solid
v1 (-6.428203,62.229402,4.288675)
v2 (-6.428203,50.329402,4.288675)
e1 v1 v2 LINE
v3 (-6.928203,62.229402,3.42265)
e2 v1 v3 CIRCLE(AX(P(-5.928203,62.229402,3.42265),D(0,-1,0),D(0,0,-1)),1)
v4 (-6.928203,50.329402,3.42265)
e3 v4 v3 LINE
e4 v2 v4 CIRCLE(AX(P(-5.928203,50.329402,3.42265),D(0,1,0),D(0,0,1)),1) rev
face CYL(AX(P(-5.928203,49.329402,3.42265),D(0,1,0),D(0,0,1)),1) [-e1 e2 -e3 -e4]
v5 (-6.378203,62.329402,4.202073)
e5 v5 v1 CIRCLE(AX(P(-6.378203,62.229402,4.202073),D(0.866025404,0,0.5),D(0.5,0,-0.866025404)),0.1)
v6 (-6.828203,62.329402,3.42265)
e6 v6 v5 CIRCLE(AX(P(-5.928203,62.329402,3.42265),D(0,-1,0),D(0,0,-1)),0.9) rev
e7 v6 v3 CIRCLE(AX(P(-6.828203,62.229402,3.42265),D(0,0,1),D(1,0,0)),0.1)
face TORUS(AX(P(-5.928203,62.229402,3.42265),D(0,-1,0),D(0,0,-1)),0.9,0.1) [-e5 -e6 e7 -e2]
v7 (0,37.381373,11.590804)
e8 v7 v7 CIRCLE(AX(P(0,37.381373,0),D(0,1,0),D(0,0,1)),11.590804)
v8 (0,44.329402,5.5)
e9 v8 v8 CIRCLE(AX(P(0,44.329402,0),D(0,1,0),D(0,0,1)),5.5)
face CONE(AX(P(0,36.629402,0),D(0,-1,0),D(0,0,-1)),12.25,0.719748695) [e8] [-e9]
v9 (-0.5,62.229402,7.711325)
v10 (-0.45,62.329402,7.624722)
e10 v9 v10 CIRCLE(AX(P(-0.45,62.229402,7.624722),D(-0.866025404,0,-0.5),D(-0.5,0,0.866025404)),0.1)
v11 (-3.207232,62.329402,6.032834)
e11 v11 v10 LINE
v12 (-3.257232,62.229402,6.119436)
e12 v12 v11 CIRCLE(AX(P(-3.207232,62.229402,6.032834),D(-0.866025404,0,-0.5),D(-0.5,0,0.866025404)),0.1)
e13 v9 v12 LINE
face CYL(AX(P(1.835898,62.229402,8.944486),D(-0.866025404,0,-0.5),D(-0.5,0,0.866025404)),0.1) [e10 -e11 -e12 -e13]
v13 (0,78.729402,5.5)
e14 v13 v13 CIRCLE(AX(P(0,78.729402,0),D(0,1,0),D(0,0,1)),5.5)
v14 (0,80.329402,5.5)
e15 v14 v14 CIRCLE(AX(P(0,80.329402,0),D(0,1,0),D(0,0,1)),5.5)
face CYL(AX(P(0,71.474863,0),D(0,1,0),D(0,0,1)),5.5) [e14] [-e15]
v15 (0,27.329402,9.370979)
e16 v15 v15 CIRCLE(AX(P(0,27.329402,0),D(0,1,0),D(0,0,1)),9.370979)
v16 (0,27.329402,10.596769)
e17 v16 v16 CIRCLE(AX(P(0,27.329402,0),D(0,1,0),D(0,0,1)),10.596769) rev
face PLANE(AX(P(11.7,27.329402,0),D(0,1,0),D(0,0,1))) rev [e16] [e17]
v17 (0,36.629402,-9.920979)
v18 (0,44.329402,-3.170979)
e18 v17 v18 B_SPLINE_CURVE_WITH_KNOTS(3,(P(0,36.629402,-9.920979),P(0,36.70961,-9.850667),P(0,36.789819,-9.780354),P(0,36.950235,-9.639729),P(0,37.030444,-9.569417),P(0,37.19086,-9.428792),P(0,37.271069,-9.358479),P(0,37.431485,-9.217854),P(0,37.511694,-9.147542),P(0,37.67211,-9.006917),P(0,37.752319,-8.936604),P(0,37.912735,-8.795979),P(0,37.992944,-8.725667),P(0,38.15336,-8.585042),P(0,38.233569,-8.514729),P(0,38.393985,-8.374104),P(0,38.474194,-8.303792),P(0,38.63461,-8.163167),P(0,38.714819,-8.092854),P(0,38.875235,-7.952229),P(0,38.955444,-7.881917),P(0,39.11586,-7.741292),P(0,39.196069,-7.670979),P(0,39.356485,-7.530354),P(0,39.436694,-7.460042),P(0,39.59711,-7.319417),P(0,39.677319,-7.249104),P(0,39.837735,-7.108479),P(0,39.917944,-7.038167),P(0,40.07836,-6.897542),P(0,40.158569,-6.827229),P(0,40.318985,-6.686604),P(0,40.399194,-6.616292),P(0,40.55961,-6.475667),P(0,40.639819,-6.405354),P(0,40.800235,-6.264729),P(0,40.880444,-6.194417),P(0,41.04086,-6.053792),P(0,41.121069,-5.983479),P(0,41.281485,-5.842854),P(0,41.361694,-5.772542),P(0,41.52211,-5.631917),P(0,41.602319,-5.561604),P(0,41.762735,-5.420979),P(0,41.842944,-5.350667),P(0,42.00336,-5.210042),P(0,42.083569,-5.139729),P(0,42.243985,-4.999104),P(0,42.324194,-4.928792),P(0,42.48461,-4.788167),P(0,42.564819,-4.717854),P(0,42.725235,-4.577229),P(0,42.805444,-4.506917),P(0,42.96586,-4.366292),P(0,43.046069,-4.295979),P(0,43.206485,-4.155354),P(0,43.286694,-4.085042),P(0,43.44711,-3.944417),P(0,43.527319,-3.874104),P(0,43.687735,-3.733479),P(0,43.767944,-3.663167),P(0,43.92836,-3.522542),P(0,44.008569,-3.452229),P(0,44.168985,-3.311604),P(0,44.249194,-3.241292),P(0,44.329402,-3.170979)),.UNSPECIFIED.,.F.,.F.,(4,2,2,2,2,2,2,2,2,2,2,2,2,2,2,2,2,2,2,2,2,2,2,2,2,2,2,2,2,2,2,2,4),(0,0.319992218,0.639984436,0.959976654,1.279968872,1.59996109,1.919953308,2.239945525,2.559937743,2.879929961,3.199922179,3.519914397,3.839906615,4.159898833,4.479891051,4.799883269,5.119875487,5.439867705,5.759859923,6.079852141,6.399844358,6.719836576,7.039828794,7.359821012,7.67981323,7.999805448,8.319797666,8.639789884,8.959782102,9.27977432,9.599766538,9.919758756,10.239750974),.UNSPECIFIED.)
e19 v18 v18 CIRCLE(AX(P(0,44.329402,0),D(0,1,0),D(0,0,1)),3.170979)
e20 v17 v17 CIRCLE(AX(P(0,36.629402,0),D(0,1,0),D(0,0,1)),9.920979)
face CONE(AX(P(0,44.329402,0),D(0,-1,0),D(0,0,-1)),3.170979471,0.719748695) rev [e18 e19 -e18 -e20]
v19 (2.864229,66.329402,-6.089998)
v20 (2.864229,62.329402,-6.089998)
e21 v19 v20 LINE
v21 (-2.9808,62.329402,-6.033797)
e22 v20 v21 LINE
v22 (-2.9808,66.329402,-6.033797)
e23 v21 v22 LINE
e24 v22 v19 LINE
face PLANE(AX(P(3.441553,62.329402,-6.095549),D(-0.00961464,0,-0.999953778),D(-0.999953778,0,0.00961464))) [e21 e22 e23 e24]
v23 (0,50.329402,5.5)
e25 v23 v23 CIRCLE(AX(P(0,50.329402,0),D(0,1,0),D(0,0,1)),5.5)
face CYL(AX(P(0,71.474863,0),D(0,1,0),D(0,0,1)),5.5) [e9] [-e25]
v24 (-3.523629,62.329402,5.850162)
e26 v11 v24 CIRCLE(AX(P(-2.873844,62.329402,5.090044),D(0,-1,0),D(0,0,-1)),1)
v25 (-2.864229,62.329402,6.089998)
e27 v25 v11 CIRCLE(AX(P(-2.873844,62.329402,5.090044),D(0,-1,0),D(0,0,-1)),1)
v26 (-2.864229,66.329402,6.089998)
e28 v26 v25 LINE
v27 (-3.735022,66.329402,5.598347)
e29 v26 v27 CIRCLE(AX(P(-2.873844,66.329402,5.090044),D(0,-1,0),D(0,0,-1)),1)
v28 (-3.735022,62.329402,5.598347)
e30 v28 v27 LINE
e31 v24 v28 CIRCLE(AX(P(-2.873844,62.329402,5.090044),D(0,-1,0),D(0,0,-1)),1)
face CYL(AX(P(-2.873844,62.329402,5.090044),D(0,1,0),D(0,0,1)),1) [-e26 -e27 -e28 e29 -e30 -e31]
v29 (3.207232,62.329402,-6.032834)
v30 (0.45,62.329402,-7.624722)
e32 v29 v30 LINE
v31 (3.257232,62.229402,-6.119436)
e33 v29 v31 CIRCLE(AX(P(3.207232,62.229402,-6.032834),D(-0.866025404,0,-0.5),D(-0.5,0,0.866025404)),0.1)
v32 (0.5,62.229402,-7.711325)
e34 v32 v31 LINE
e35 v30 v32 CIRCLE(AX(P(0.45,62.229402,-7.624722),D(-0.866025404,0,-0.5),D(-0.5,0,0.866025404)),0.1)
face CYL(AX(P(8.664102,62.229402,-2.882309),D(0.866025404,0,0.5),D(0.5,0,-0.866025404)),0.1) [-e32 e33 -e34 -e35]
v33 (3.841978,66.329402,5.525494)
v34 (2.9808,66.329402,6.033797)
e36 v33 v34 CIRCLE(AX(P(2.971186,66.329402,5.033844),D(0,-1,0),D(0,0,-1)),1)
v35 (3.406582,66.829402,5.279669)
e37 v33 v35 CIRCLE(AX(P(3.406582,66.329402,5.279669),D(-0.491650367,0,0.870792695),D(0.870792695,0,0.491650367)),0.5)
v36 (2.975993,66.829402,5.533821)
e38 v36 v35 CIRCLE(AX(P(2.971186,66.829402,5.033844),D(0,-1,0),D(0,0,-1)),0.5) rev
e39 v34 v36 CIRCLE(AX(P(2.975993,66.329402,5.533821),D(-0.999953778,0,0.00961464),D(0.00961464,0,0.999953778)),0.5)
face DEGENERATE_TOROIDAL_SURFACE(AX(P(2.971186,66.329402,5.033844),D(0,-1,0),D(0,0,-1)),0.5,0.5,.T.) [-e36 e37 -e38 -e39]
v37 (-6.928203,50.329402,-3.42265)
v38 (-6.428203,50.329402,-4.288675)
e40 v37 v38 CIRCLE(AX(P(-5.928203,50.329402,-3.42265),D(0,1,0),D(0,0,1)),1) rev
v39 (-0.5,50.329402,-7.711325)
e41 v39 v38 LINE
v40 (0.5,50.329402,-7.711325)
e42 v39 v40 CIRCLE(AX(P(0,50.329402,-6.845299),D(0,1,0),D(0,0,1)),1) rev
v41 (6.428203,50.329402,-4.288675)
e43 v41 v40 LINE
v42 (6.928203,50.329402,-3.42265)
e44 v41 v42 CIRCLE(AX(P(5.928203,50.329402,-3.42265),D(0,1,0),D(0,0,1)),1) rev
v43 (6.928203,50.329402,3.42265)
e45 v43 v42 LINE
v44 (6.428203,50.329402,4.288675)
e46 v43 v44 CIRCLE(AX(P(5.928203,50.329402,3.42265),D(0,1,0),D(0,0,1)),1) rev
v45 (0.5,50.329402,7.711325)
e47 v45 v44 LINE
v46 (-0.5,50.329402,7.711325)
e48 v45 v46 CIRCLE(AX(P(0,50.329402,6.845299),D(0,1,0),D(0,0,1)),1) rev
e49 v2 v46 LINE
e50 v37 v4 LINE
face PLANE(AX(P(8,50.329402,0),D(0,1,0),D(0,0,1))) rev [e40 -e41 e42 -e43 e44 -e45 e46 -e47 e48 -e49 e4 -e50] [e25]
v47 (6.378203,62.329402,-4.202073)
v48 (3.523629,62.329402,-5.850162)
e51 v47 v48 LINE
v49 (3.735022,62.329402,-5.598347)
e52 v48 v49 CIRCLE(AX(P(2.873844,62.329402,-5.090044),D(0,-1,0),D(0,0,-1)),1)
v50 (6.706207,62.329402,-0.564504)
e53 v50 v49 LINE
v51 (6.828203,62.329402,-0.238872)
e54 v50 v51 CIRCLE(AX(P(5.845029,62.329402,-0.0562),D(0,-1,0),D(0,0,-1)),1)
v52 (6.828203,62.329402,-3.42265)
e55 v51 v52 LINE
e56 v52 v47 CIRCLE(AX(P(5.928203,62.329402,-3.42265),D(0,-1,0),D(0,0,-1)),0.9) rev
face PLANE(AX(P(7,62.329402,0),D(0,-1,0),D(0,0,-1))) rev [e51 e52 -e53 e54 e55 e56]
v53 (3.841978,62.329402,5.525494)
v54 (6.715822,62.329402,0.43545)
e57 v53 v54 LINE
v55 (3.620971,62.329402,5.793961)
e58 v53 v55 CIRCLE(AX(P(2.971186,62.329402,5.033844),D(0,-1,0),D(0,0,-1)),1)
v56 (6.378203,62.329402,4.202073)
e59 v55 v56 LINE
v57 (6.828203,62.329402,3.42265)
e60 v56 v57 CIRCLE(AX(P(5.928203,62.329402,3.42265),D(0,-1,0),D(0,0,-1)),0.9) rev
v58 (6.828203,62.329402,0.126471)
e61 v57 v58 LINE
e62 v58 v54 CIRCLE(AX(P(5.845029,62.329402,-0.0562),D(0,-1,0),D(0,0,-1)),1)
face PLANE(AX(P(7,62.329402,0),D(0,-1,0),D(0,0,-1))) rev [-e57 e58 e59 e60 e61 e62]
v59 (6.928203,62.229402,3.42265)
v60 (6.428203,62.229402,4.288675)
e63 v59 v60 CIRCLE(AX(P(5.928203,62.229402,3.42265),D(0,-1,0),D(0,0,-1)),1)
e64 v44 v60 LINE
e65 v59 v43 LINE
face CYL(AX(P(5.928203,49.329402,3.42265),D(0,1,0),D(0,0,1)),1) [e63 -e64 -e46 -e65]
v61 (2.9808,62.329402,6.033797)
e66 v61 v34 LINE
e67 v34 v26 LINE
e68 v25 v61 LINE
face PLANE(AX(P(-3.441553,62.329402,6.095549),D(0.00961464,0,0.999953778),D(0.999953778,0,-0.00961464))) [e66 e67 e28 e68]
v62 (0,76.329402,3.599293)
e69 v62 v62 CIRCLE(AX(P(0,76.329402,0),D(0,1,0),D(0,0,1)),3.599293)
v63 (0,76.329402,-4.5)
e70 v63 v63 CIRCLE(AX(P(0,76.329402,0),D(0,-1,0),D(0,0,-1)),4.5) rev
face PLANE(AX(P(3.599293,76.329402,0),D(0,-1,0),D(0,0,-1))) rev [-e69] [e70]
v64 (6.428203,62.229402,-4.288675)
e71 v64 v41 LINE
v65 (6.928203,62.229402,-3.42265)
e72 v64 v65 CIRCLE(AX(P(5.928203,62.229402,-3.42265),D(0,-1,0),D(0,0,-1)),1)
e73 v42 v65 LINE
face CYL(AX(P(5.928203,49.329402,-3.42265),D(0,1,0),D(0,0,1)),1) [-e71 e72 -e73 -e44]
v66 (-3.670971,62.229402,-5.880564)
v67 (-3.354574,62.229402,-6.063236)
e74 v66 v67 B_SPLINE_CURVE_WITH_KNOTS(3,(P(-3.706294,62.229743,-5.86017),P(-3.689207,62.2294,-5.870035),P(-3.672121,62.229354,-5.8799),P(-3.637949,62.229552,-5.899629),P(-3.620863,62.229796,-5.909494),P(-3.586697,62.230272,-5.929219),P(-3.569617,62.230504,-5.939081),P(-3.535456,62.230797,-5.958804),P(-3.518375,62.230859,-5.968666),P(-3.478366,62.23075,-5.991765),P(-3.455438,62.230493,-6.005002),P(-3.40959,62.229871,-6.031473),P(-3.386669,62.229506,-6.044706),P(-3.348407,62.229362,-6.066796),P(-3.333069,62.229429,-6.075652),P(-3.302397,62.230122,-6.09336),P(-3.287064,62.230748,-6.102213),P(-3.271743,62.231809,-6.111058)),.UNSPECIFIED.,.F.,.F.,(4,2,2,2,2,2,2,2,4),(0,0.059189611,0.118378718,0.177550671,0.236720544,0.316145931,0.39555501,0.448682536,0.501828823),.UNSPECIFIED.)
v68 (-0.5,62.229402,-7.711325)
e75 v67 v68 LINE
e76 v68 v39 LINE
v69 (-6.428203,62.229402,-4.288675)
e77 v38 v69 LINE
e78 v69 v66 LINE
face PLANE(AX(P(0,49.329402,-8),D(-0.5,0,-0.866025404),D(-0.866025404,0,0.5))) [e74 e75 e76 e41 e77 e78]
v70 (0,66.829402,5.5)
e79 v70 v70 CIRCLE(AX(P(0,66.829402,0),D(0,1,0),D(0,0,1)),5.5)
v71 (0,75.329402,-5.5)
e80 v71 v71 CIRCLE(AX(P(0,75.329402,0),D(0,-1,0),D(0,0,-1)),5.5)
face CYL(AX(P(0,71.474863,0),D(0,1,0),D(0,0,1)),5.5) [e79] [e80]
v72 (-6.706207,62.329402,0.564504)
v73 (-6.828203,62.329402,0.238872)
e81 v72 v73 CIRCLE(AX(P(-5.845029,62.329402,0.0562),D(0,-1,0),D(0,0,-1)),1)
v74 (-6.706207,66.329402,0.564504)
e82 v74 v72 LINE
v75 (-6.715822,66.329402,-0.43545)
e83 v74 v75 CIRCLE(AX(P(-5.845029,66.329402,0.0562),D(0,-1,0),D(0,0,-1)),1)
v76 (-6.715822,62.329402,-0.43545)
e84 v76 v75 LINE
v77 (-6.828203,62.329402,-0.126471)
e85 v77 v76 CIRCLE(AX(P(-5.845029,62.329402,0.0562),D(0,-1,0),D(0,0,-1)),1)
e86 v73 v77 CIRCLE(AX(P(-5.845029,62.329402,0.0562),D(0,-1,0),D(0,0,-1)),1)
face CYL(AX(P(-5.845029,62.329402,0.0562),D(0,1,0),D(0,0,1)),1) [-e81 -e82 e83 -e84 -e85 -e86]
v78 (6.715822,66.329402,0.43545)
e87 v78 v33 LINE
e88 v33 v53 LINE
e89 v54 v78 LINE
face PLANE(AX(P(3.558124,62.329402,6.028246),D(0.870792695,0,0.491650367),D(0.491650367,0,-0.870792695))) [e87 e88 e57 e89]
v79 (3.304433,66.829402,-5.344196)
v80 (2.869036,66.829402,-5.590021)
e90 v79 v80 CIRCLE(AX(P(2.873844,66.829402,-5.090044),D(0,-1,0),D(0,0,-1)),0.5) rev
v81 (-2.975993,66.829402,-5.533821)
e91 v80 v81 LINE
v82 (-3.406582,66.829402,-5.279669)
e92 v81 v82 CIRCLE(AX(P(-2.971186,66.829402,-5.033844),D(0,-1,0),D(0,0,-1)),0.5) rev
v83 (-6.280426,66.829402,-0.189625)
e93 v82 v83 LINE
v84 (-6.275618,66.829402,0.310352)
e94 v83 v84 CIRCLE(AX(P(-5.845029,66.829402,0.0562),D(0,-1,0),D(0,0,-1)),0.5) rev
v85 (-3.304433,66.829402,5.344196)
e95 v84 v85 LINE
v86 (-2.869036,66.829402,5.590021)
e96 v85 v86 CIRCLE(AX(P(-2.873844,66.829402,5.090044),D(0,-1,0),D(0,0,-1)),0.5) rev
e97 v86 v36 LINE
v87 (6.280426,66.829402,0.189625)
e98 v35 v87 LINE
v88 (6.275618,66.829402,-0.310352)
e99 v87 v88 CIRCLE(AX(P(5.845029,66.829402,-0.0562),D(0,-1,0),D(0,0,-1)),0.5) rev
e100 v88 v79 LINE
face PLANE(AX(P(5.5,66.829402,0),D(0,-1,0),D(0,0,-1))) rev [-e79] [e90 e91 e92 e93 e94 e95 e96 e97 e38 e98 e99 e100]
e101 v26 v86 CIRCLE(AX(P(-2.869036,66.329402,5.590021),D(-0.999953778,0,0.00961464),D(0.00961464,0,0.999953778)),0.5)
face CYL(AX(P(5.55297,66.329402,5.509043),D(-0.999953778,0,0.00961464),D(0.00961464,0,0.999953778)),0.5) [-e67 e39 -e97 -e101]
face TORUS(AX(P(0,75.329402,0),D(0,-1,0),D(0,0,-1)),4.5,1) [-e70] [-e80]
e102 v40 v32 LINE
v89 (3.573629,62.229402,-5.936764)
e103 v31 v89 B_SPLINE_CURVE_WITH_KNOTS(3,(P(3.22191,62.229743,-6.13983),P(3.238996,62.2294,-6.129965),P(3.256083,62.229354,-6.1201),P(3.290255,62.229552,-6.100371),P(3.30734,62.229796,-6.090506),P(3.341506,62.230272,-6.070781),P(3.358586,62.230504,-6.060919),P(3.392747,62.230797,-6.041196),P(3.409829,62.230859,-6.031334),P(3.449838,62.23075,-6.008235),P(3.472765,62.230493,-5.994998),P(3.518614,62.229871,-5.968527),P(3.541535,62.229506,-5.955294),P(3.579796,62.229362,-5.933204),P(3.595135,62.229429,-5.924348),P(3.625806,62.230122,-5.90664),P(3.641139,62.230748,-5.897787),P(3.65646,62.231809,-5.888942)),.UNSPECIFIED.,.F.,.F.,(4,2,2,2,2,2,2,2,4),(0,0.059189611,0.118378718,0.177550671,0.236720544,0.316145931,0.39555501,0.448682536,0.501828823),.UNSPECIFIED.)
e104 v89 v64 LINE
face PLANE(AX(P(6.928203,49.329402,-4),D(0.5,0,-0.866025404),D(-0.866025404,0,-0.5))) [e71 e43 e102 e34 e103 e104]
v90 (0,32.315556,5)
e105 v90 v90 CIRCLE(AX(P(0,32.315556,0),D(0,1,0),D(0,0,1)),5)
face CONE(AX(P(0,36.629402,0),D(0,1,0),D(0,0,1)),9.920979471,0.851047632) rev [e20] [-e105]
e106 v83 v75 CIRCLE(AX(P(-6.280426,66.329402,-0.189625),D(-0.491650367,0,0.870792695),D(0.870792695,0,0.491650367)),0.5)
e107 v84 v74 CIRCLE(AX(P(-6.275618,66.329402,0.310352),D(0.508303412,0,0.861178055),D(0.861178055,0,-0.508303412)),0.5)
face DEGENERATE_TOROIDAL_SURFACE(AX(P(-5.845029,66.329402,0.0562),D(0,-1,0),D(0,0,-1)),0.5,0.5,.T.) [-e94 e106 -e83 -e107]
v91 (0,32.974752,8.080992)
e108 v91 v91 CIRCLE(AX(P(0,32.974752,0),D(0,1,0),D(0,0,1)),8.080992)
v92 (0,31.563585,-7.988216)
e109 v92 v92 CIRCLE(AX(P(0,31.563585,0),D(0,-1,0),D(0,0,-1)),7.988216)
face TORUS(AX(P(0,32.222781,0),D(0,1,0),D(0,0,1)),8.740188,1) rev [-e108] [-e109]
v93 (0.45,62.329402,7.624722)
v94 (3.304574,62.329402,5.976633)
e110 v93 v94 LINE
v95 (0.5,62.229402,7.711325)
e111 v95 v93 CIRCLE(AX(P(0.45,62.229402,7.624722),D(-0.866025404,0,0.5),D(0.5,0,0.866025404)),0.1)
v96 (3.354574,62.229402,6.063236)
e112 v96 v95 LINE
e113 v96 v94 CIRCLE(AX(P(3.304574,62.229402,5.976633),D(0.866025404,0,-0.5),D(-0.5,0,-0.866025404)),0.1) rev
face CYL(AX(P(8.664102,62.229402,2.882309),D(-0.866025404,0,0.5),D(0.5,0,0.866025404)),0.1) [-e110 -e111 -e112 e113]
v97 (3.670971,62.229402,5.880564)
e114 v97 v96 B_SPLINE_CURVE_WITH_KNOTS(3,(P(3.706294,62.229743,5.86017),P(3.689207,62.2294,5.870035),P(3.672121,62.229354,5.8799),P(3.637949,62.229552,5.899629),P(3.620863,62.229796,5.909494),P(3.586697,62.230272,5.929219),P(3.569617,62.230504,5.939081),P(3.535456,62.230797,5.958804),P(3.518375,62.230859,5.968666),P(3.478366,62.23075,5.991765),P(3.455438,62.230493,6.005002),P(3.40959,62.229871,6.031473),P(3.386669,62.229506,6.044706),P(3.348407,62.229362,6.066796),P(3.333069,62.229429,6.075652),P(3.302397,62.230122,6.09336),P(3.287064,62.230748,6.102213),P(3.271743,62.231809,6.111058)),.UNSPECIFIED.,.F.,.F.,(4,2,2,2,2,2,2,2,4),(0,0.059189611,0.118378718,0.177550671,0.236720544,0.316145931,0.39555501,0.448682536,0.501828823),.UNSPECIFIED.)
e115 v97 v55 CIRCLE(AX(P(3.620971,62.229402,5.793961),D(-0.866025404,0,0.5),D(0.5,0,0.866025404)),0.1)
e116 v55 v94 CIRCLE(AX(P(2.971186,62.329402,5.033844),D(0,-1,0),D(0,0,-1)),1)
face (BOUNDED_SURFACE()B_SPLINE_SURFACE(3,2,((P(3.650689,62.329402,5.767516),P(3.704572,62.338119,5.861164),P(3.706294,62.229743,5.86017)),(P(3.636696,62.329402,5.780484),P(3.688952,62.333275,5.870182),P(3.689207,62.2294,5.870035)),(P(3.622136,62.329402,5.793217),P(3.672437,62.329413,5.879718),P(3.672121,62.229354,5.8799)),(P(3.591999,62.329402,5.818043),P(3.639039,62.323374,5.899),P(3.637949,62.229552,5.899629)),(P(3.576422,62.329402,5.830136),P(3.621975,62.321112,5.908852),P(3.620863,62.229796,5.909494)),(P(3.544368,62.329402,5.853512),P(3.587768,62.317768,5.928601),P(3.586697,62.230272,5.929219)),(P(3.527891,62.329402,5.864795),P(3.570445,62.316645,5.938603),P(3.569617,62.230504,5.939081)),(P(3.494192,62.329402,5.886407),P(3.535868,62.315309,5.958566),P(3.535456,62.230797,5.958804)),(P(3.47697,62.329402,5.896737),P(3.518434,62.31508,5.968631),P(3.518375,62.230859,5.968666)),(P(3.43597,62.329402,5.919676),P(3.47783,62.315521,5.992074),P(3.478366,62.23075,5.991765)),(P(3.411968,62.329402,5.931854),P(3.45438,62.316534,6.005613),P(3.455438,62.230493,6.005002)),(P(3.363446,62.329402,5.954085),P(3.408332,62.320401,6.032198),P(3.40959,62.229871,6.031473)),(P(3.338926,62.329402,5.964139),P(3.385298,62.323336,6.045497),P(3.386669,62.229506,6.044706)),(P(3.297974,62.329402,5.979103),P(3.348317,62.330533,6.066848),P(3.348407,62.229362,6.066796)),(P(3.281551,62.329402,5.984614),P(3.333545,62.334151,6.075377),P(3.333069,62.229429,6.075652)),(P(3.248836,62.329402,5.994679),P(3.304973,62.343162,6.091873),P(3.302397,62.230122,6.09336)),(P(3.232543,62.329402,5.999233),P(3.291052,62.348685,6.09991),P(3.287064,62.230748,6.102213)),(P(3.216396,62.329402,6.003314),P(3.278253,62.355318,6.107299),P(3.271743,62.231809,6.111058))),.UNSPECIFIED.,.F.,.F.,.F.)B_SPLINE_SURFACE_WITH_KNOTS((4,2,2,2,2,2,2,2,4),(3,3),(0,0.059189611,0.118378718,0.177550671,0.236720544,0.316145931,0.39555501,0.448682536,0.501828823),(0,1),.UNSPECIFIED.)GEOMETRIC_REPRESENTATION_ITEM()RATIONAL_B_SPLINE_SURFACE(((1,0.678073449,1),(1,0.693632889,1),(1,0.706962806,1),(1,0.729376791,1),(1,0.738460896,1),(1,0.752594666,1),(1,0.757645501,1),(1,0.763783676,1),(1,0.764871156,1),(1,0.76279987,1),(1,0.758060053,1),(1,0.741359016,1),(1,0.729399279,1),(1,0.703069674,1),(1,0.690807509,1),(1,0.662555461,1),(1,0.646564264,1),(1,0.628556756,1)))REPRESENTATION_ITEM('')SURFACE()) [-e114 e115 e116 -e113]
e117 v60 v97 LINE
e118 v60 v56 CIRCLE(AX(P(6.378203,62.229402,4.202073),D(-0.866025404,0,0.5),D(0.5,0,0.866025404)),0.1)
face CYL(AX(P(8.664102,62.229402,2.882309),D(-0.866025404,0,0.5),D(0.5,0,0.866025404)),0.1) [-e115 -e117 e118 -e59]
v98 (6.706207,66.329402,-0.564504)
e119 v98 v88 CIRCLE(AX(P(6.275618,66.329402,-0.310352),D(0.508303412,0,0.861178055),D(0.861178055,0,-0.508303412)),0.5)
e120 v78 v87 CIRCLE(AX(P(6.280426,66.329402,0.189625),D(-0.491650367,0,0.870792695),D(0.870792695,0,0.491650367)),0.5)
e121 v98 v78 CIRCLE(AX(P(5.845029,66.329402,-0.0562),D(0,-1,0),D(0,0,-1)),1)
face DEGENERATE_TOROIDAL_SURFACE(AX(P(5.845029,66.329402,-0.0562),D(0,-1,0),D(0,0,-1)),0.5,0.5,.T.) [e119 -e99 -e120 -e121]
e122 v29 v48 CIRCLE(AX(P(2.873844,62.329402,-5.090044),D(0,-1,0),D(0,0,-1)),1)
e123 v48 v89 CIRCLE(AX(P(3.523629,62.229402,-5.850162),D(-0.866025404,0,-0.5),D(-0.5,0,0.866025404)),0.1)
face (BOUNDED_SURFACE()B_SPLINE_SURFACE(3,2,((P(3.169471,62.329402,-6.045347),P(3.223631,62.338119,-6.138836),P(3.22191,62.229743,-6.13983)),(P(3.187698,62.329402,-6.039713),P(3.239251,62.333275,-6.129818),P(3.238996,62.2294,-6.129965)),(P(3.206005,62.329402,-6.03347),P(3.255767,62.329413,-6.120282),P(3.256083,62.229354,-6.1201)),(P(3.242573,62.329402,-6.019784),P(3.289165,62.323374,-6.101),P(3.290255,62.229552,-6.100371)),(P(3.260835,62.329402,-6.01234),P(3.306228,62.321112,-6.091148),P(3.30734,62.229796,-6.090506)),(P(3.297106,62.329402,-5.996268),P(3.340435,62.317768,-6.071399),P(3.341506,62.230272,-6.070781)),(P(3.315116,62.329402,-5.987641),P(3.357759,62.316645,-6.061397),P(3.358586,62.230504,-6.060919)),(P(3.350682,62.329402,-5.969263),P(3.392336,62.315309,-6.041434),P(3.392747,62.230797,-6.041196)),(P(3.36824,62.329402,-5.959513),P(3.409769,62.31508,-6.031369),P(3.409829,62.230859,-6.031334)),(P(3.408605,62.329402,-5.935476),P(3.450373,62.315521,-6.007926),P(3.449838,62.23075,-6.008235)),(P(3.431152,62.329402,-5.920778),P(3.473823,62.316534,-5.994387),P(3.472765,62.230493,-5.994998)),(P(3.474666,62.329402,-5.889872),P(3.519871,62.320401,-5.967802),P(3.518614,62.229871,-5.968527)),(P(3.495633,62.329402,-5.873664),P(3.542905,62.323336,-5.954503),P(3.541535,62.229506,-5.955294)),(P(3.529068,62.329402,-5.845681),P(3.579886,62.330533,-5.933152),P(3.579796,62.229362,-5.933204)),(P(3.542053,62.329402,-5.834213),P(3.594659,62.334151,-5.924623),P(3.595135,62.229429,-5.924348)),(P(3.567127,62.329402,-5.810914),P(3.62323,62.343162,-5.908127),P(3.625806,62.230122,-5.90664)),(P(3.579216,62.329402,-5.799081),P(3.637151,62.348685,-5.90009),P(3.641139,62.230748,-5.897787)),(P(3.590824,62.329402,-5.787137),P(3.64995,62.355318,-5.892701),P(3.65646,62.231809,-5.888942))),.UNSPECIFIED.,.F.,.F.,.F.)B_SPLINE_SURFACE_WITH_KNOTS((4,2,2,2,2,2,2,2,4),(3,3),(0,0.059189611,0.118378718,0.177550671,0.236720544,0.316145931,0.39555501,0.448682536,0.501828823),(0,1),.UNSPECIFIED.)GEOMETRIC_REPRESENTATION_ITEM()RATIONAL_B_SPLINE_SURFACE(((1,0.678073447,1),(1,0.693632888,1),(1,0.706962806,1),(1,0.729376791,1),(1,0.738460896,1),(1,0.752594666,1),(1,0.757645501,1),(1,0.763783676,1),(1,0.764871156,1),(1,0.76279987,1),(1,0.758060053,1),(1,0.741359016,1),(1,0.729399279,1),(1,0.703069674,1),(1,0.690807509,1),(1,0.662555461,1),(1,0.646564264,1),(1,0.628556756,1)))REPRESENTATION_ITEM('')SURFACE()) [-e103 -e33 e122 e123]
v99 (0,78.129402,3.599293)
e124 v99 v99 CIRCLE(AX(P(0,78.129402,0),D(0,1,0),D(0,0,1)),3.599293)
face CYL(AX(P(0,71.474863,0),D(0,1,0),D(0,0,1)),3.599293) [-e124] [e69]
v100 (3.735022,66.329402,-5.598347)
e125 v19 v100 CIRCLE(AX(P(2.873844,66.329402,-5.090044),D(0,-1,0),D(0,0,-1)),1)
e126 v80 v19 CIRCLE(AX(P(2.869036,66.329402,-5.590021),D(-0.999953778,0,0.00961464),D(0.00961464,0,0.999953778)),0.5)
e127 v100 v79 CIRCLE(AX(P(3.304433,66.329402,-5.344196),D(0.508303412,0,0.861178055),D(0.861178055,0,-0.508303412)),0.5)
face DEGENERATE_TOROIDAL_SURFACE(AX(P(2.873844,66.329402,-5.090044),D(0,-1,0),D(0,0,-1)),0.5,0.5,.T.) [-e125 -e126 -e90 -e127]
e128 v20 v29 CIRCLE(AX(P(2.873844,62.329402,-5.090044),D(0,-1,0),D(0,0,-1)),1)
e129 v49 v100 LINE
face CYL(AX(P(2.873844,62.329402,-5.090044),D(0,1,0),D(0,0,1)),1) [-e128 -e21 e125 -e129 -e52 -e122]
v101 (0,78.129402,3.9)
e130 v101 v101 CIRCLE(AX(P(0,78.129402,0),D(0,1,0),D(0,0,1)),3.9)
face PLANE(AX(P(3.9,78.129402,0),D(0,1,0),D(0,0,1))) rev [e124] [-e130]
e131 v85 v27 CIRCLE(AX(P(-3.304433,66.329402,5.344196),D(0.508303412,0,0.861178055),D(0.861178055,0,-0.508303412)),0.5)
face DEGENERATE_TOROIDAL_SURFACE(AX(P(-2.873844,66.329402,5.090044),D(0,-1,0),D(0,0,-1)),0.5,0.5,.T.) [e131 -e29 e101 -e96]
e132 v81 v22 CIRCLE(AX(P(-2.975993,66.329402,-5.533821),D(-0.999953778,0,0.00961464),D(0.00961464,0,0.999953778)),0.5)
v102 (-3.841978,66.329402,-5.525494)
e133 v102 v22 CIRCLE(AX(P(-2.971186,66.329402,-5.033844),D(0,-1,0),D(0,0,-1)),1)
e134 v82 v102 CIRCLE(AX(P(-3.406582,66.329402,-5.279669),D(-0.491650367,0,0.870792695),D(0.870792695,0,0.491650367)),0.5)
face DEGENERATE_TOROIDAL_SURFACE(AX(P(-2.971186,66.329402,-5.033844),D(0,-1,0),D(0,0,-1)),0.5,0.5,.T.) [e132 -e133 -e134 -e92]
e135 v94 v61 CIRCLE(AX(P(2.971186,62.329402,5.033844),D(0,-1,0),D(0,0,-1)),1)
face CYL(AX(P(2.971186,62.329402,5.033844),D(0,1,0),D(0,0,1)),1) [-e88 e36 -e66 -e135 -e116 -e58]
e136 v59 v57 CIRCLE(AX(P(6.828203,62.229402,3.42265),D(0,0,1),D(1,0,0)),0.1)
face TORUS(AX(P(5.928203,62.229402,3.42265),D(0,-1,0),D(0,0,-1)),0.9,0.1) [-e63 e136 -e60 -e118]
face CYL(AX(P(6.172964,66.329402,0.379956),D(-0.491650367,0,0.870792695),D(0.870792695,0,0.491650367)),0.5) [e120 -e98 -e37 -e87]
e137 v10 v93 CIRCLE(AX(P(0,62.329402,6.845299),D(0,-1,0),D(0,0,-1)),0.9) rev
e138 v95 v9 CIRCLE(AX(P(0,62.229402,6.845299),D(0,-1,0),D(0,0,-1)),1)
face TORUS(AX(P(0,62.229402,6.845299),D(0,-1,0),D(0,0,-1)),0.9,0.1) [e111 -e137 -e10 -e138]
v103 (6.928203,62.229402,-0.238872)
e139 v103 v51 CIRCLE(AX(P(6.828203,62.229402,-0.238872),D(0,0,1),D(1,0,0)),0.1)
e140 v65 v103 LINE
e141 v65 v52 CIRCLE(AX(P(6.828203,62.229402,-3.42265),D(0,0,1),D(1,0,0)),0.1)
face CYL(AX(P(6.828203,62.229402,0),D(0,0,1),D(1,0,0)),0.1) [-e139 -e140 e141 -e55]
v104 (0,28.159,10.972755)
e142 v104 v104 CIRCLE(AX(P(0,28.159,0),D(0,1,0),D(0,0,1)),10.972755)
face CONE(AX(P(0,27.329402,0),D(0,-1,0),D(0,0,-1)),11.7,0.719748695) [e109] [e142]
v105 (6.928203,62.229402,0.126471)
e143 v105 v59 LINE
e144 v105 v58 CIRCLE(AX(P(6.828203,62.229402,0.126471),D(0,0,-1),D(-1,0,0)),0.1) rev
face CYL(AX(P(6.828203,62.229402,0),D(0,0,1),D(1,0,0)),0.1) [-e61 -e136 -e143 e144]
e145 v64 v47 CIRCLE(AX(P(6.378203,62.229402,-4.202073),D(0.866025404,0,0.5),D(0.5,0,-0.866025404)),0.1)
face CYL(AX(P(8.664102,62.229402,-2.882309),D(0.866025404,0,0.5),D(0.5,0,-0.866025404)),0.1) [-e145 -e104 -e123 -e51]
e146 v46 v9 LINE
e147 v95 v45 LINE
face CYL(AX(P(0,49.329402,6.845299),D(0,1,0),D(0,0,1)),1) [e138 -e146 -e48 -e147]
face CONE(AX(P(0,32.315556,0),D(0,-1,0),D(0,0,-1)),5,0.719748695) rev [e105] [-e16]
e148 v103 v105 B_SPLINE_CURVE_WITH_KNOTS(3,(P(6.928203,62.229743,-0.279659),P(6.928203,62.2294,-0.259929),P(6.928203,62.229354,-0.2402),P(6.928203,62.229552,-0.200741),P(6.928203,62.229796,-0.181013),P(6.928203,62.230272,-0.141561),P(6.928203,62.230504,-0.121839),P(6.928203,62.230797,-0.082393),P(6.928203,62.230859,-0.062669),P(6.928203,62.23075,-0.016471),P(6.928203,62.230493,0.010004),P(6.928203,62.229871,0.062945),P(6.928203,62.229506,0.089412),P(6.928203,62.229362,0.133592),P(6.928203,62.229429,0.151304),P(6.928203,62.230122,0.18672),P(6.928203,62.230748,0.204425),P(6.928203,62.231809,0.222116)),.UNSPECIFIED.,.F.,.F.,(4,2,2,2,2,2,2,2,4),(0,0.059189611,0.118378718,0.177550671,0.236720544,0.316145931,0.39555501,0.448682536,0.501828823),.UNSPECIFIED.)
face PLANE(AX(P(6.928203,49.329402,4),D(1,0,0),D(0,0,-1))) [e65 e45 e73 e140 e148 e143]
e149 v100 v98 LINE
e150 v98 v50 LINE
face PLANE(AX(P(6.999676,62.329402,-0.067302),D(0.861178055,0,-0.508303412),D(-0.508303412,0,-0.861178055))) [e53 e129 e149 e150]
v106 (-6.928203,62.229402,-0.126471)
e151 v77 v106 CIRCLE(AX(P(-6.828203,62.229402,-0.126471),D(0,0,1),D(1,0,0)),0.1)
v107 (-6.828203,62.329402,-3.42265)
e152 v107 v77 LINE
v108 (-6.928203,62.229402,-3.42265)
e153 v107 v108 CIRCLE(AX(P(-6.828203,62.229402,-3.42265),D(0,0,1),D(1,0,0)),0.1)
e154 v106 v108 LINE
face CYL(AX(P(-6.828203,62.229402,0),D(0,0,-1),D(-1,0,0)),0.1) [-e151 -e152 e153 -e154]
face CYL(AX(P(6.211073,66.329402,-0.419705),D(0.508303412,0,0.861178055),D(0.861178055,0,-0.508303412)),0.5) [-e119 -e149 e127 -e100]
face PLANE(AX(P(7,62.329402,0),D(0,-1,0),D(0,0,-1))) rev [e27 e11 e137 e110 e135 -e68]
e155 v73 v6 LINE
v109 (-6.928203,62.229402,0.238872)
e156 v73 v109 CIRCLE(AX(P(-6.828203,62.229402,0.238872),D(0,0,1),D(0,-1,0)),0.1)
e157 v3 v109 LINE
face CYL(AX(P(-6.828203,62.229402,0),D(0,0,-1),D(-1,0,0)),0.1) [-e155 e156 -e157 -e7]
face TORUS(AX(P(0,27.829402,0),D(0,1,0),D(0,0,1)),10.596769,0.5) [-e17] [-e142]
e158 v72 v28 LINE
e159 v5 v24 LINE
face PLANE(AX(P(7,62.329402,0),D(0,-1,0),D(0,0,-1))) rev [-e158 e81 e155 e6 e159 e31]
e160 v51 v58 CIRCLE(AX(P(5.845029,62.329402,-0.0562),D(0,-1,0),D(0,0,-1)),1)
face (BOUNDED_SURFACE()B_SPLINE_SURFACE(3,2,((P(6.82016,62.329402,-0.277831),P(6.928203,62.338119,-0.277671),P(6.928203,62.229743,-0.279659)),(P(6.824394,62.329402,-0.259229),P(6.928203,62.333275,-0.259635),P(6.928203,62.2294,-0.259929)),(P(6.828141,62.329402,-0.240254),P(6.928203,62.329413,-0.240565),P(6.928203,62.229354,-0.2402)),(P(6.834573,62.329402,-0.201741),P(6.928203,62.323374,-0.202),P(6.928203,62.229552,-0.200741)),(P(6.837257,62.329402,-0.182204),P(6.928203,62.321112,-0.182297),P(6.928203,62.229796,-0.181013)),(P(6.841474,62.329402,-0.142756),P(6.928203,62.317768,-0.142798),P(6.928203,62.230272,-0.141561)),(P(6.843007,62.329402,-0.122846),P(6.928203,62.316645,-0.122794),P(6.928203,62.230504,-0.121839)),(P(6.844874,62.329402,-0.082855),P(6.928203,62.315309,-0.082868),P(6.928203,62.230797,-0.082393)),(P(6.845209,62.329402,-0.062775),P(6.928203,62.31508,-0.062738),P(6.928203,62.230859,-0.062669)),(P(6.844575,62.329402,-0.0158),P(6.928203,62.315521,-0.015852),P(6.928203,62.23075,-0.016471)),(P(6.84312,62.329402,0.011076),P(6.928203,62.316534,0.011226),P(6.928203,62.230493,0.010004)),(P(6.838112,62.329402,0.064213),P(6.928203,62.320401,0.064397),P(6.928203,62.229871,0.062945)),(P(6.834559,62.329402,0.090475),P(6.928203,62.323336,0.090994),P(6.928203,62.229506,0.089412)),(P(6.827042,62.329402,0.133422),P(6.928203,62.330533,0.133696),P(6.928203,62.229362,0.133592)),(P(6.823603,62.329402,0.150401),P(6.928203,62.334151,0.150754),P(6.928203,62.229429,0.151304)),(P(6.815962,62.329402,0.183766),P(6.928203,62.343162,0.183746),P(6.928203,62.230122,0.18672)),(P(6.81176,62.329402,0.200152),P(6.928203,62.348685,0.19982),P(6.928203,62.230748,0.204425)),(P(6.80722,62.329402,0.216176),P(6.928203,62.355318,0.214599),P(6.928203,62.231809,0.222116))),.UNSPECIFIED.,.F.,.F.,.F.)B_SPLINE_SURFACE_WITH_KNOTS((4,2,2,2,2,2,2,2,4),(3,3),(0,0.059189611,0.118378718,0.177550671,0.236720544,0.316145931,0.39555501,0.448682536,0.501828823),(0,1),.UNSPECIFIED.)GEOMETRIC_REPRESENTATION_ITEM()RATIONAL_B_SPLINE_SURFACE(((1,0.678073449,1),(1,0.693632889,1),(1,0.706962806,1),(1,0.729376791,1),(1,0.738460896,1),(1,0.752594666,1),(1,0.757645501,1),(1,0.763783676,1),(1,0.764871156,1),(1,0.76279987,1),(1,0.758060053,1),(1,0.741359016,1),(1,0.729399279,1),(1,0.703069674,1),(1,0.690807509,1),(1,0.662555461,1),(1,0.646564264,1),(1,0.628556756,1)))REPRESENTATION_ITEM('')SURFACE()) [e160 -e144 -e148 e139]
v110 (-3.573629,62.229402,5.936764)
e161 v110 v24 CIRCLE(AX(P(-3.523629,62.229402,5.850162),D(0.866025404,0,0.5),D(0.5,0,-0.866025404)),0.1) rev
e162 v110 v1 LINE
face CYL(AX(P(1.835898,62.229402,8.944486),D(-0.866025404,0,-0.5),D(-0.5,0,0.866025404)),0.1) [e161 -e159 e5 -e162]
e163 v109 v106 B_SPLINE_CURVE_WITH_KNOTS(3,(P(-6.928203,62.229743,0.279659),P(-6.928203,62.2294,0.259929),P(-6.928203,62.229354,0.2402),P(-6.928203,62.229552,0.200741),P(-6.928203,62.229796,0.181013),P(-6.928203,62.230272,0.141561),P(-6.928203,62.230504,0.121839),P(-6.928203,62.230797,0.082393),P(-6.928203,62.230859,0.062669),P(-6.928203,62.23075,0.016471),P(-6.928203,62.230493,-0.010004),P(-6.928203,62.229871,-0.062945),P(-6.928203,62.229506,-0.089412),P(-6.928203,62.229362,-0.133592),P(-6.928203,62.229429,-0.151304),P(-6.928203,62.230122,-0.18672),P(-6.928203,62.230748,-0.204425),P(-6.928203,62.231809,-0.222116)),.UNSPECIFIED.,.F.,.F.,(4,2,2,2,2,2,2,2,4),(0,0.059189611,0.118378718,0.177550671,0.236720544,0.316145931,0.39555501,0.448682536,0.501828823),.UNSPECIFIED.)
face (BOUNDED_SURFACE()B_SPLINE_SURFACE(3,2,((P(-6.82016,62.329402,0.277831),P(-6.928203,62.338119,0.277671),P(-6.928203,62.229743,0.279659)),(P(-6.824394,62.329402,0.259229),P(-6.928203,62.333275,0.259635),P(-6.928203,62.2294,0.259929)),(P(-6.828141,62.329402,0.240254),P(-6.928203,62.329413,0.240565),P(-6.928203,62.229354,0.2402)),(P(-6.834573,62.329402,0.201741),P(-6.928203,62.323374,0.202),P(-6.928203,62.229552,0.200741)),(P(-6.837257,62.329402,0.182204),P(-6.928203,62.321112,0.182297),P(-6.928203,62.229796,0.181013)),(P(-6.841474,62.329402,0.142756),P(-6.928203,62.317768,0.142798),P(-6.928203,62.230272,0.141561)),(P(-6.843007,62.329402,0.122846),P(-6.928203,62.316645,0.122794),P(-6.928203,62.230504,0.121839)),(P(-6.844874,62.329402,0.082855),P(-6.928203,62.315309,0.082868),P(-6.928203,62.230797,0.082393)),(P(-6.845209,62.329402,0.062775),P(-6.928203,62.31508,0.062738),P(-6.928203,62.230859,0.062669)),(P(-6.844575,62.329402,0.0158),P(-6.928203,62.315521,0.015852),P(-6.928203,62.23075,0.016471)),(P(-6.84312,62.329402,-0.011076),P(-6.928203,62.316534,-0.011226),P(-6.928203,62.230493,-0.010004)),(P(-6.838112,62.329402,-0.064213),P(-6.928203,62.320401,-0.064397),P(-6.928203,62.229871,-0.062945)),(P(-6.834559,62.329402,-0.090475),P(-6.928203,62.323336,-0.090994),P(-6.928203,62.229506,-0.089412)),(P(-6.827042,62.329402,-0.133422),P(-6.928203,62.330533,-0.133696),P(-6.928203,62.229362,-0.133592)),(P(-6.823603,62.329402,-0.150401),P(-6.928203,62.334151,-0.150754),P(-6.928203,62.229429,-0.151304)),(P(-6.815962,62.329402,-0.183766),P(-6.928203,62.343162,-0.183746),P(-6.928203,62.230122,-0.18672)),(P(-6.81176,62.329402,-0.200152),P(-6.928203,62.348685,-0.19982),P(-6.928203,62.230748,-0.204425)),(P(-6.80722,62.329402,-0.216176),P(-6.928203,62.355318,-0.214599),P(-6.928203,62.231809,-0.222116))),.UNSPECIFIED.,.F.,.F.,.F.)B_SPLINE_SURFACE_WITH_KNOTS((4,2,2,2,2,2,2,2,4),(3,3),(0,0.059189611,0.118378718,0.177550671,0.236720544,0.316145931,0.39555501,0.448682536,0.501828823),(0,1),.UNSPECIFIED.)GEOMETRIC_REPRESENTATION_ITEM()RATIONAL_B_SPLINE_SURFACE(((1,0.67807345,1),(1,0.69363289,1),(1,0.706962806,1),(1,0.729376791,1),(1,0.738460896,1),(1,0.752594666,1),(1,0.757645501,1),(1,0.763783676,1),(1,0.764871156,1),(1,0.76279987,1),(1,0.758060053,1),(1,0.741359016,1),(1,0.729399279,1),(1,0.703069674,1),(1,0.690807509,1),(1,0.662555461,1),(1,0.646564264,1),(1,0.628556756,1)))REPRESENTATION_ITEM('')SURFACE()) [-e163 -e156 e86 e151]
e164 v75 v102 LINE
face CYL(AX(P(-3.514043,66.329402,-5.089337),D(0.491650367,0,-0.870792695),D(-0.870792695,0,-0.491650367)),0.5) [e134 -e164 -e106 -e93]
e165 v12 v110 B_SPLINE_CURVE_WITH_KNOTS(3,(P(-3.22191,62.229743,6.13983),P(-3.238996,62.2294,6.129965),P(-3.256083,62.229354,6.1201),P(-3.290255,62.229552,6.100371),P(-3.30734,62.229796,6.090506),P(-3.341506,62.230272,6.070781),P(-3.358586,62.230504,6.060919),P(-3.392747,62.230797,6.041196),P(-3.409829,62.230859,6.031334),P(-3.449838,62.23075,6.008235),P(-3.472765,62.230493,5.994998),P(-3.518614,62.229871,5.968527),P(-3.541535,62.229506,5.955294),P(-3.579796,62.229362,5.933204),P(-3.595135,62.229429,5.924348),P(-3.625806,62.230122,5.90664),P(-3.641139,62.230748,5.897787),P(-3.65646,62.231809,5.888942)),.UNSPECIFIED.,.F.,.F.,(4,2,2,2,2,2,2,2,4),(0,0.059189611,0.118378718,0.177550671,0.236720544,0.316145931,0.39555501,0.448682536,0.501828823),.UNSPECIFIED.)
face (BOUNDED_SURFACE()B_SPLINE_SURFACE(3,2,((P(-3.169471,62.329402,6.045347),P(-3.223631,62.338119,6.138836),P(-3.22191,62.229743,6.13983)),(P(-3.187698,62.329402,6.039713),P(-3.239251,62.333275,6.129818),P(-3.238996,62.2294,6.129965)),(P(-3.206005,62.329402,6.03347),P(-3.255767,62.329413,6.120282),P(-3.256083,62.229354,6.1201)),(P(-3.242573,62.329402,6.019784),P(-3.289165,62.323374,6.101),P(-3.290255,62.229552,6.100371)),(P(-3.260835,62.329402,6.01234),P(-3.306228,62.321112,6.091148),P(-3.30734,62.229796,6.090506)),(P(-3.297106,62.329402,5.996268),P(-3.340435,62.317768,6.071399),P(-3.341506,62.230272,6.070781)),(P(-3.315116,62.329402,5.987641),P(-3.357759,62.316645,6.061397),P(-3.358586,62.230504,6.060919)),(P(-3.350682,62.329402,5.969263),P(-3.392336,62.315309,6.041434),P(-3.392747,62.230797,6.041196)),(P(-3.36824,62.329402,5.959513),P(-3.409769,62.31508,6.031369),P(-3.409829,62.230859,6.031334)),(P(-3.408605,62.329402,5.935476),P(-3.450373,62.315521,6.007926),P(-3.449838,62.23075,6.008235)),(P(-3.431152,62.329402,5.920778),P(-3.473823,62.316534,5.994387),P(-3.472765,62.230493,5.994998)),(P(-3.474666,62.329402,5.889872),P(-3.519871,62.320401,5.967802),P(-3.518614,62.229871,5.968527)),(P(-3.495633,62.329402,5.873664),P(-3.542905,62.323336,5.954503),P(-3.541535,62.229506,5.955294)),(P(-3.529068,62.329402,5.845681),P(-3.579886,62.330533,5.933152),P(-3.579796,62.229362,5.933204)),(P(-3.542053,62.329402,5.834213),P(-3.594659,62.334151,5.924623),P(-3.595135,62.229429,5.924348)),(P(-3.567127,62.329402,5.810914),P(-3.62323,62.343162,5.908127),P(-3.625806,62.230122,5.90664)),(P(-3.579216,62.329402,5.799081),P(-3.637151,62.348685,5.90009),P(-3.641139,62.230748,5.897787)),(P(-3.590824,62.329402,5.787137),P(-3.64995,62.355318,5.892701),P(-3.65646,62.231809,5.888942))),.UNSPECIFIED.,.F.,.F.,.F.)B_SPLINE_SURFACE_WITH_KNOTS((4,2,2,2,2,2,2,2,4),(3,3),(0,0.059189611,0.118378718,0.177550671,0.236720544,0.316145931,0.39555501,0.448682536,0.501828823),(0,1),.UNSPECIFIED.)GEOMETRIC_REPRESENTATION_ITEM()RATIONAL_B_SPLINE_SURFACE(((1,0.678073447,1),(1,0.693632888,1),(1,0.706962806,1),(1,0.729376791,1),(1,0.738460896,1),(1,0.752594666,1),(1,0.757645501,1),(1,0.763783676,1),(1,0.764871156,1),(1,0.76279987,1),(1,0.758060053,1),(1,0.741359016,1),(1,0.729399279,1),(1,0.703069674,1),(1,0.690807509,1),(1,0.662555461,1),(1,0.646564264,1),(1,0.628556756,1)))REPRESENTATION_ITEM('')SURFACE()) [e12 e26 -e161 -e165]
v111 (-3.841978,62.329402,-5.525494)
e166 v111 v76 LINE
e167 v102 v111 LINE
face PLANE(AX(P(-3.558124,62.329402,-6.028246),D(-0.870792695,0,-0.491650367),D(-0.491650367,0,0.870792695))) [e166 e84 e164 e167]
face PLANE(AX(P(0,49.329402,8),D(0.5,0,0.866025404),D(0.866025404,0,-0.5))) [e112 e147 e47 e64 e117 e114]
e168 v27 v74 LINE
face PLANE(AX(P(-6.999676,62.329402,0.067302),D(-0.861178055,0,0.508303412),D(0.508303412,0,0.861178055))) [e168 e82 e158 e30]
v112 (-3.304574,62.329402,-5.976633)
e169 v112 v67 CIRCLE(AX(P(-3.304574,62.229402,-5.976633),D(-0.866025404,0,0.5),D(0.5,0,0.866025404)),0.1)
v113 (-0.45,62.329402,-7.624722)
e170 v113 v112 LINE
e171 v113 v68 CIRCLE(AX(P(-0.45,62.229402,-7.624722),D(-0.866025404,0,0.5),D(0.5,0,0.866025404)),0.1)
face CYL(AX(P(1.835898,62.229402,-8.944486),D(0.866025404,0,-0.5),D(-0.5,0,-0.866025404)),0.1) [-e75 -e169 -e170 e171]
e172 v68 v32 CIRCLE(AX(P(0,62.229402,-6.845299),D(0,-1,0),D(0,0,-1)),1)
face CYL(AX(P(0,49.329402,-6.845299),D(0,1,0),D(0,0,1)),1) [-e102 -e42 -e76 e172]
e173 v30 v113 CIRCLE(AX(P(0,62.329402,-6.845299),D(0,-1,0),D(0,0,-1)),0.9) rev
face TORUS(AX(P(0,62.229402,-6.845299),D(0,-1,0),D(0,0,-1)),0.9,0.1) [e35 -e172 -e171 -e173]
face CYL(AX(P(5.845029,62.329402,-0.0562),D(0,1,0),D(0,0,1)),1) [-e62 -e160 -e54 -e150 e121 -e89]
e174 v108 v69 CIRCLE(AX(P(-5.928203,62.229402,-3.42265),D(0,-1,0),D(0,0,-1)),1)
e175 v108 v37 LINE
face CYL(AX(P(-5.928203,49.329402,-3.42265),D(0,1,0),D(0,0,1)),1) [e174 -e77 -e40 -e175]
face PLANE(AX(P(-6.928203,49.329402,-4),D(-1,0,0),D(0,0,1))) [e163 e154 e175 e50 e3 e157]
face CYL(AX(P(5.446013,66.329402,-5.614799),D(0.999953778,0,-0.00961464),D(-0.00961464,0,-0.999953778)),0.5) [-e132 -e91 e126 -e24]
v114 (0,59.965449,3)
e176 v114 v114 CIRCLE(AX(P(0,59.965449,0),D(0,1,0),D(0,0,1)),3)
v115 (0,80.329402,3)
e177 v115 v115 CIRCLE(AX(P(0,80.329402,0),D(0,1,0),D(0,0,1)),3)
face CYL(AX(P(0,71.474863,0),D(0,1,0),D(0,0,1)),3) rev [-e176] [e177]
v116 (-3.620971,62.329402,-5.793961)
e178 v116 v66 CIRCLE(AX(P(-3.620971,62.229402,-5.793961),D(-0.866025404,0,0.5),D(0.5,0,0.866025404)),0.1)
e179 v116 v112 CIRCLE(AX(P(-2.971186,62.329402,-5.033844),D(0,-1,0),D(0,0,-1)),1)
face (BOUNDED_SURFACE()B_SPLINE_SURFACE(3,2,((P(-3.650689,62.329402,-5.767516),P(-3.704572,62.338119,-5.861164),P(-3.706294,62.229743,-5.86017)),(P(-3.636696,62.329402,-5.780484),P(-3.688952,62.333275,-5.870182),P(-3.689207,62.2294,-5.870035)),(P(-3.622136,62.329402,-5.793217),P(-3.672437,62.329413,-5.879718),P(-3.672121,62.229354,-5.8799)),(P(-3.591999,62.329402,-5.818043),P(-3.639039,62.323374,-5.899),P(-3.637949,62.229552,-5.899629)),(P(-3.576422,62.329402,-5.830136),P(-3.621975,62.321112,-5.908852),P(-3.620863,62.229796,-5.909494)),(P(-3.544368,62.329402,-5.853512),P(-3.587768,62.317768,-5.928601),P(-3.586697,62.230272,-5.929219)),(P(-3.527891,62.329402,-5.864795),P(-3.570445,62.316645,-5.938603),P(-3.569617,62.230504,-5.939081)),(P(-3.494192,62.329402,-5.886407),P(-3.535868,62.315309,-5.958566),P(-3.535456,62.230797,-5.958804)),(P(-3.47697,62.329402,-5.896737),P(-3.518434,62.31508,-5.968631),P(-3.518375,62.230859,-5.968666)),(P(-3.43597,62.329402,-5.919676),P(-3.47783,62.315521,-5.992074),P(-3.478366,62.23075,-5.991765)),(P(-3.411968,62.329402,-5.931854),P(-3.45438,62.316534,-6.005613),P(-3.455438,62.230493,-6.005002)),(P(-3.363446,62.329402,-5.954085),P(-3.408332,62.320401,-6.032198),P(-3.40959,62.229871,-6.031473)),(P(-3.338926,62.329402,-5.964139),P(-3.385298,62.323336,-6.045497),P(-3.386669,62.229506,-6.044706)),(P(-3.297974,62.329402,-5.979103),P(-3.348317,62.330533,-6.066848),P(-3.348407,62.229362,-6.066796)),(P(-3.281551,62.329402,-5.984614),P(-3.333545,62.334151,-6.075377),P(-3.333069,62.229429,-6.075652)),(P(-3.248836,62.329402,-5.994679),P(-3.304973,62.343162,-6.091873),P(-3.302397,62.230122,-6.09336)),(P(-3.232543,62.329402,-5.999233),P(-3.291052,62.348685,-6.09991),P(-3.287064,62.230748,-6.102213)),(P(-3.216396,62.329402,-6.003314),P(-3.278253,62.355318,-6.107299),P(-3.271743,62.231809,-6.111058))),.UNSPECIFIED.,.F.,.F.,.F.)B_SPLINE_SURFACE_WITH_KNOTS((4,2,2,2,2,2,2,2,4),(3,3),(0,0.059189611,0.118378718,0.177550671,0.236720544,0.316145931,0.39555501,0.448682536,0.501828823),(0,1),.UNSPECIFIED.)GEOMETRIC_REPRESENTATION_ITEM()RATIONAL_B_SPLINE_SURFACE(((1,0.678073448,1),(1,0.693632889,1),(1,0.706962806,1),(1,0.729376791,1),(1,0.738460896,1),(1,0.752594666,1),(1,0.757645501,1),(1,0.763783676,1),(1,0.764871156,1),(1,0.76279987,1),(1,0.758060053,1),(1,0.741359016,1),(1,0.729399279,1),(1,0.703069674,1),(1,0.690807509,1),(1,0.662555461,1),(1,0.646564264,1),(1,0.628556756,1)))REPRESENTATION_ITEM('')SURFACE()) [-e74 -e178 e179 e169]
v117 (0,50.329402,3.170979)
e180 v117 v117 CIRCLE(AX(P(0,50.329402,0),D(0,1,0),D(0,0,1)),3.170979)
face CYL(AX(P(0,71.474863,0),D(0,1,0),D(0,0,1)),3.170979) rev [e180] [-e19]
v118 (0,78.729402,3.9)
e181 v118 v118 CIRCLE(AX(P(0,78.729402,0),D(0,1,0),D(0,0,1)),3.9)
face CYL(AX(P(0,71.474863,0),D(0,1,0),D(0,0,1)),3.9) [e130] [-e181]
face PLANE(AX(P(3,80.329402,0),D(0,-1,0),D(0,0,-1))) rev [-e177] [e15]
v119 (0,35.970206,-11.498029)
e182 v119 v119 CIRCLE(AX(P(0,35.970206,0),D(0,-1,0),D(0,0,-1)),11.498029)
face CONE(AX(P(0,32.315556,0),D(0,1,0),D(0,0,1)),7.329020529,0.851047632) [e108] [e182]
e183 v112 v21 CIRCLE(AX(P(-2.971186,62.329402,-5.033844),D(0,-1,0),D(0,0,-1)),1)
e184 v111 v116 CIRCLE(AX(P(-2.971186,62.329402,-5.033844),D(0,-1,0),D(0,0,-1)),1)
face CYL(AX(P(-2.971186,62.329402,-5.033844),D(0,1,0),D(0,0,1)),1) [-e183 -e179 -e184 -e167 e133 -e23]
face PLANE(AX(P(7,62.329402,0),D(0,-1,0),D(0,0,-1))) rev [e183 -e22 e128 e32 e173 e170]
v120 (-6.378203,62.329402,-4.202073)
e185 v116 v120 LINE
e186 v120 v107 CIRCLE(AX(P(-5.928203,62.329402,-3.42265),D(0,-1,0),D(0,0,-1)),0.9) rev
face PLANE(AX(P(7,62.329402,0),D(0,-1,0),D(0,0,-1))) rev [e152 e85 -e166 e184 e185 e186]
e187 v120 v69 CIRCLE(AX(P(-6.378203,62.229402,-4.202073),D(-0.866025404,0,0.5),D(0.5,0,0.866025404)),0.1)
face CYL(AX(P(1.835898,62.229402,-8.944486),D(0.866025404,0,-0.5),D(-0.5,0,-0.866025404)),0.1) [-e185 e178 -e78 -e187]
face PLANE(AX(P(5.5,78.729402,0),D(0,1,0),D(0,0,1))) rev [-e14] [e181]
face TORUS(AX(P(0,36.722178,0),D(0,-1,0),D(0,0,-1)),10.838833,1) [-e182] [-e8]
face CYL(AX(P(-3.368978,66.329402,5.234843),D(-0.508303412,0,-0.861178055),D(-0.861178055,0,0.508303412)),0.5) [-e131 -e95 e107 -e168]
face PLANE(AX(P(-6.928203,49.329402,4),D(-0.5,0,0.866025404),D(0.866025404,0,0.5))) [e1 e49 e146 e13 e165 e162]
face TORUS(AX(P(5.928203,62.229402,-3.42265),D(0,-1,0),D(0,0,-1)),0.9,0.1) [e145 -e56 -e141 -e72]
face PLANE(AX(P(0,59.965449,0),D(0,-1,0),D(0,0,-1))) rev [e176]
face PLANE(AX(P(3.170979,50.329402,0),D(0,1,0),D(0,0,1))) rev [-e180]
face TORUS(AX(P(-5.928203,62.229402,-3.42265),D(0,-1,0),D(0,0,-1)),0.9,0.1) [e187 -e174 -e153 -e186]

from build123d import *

# Parameters (mm, degrees)
CONG_1_R                        = 1
ENL_V_DE_MAT_EXTRU_MINCE1_DEPTH = 13
ENL_V_DE_MAT_EXTRU_MINCE2_DEPTH = 4.5
CONG_2_R                        = 1
CONG_3_R                        = 0.5
CONG_4_R                        = 0.1


with BuildPart() as part:
    # Esquisse1 → Révolution1 (revolve)
    with BuildSketch(Plane.XY, mode=Mode.PRIVATE) as r_volution1_sk:
        Polygon((0, 59.965448797), (3, 59.965448797), (3, 80.32940186), (5.5, 80.32940186), (5.5, 78.72940186), (3.9, 78.72940186), (3.9, 78.12940186), (3.599292622, 78.12940186), (3.599292622, 76.32940186), (5.5, 76.32940186), (5.5, 66.82940186), (7, 66.82940186), (7, 62.32940186), (8, 62.32940186), (8, 50.32940186), (5.5, 50.32940186), (5.5, 44.32940186), (12.25, 36.62940186), (7.329020529, 32.315556219), (11.7, 27.32940186), (9.370979471, 27.32940186), (5, 32.315556219), (9.920979471, 36.62940186), (3.170979471, 44.32940186), (3.170979471, 50.32940186), (0, 50.32940186), align=None)
    revolve(r_volution1_sk.sketch.rotate(Axis((0, 71.474862782, 0), (0, -1, 0)), 90), axis=Axis((0, 71.474862782, 0), (0, -1, 0)))

    # Congé1
    cong_1_edges = [part.edges().sort_by_distance(p)[0] for p in [
        (0, 32.315556219, -7.329020529),
        (0, 36.62940186, -12.25),
        (0, 76.32940186, -5.5),
    ]]
    fillet(cong_1_edges, radius=CONG_1_R)

    # Esquisse2 → Enlèv. de mat.-Extru.-Mince1 (cut)
    with BuildSketch(Plane(origin=(0, 62.32940186, 0), x_dir=(1, 0, 0), z_dir=(0, 1, 0))):
        Polygon((0, 31.094010768), (-26.92820323, 15.547005384), (-26.92820323, -15.547005384), (0, -31.094010768), (26.92820323, -15.547005384), (26.92820323, 15.547005384), align=None)
        Polygon((0, 8), (-6.92820323, 4), (-6.92820323, -4), (0, -8), (6.92820323, -4), (6.92820323, 4), align=None, mode=Mode.SUBTRACT)
    extrude(amount=-ENL_V_DE_MAT_EXTRU_MINCE1_DEPTH, mode=Mode.SUBTRACT)

    # Esquisse3 → Enlèv. de mat.-Extru.-Mince2 (cut)
    with BuildSketch(Plane(origin=(0, 66.82940186, 0), x_dir=(1, 0, 0), z_dir=(0, 1, 0))):
        Polygon((-15.296888339, 25.91630165), (-30.092619771, -0.289343076), (-14.795731431, -26.205644726), (15.296888339, -25.91630165), (30.092619771, 0.289343076), (14.795731431, 26.205644726), align=None)
        Polygon((-3.558123881, 6.028246383), (-6.999676448, -0.067302479), (-3.441552567, -6.095548862), (3.558123881, -6.028246383), (6.999676448, 0.067302479), (3.441552567, 6.095548862), align=None, mode=Mode.SUBTRACT)
    extrude(amount=-ENL_V_DE_MAT_EXTRU_MINCE2_DEPTH, mode=Mode.SUBTRACT)

    # Congé2
    # the kernel refuses this fillet: 1 mm, written as the material it takes off along each edge
    with BuildSketch(Plane(origin=(3.441552567, 68.272777533, -6.095548862), x_dir=(0.5083034115189873, 0, 0.8611780546659088), z_dir=(0, -1, 0)), Plane(origin=(6.999676448, 68.272777533, -0.067302479), x_dir=(-0.4916503667628478, 0, 0.8707926945386928), z_dir=(0, -1, 0)), Plane(origin=(3.558123881, 68.272777533, 6.028246383), x_dir=(-0.9999537782818346, 0, 0.009614639872783763), z_dir=(0, -1, 0)), Plane(origin=(-6.999676448, 68.272777533, 0.067302479), x_dir=(0.4916503667628478, 0, -0.8707926945386928), z_dir=(0, -1, 0)), Plane(origin=(-3.558123881, 68.272777533, -6.028246383), x_dir=(0.9999537782818346, 0, -0.009614639872783763), z_dir=(0, -1, 0))) as cong_2_piece_1:
        with BuildLine():
            CenterArc((CONG_2_R * 0.57735026919, CONG_2_R), CONG_2_R, 210, 60)
            Line((-CONG_2_R * 0.288675134595, CONG_2_R * 0.5), (0, 0))
            Line((0, 0), (CONG_2_R * 0.57735026919, 0))
        make_face()
    extrude(amount=5.943375673, mode=Mode.SUBTRACT)
    with BuildSketch(Plane(origin=(-3.441552567, 68.272777533, 6.095548862), x_dir=(0.9999537782818347, 0, -0.009614639872783772), z_dir=(0, -1, 0))) as cong_2_piece_2:
        with BuildLine():
            CenterArc((CONG_2_R * 0.57735026919, -CONG_2_R), CONG_2_R, 90, 60)
            Line((-CONG_2_R * 0.288675134595, -CONG_2_R * 0.5), (0, 0))
            Line((0, 0), (CONG_2_R * 0.57735026919, 0))
        make_face()
    extrude(amount=5.943375673, mode=Mode.SUBTRACT)
    with BuildSketch(Plane(origin=(6.92820323, 63.772777533, -4), x_dir=(0, 0, 1), z_dir=(0, -1, 0)), Plane(origin=(6.92820323, 63.772777533, 4), x_dir=(-0.8660254037844343, 0, 0.5000000000000073), z_dir=(0, -1, 0)), Plane(origin=(-6.92820323, 63.772777533, 4), x_dir=(0, 0, -1), z_dir=(0, -1, 0)), Plane(origin=(-6.92820323, 63.772777533, -4), x_dir=(0.8660254037844383, 0, -0.5000000000000008), z_dir=(0, -1, 0)), Plane(origin=(0, 63.772777533, -8), x_dir=(0.8660254037844421, 0, 0.4999999999999941), z_dir=(0, -1, 0))) as cong_2_piece_3:
        with BuildLine():
            CenterArc((CONG_2_R * 0.57735026919, CONG_2_R), CONG_2_R, 210, 60)
            Line((-CONG_2_R * 0.288675134595, CONG_2_R * 0.5), (0, 0))
            Line((0, 0), (CONG_2_R * 0.57735026919, 0))
        make_face()
    extrude(amount=14.886751346, mode=Mode.SUBTRACT)
    with BuildSketch(Plane(origin=(0, 63.772777533, 8), x_dir=(0.8660254037844343, 0, -0.5000000000000075), z_dir=(0, -1, 0))) as cong_2_piece_4:
        with BuildLine():
            CenterArc((CONG_2_R * 0.57735026919, -CONG_2_R), CONG_2_R, 90, 60)
            Line((-CONG_2_R * 0.288675134595, -CONG_2_R * 0.5), (0, 0))
            Line((0, 0), (CONG_2_R * 0.57735026919, 0))
        make_face()
    extrude(amount=14.886751346, mode=Mode.SUBTRACT)

    # Congé3
    cong_3_edges = [part.edges().sort_by_distance(p)[0] for p in [
        (0, 27.32940186, -11.7),
        (-0.058285657, 66.82940186, -6.061897622),
        (-5.278900164, 66.82940186, -2.980471952),
        (-5.220614508, 66.82940186, 3.08142567),
        (0.058285657, 66.82940186, 6.061897622),
        (5.278900164, 66.82940186, 2.980471952),
        (5.220614508, 66.82940186, -3.08142567),
        (-6.84498306, 66.82940186, 0.065815089),
        (-3.365493991, 66.82940186, 5.960836763),
        (3.479489069, 66.82940186, 5.895021674),
        (6.84498306, 66.82940186, -0.065815089),
        (3.365493991, 66.82940186, -5.960836763),
        (-3.479489069, 66.82940186, -5.895021674),
    ]]
    fillet(cong_3_edges, radius=CONG_3_R)

    # Congé4
    cong_4_edges = [part.edges().sort_by_distance(p)[0] for p in [
        (0, 62.32940186, -7.845299462),
        (6.794228634, 62.32940186, -3.922649731),
        (6.794228634, 62.32940186, 3.922649731),
        (0, 62.32940186, 7.845299462),
        (-6.794228634, 62.32940186, -3.922649731),
        (-6.794228634, 62.32940186, 3.922649731),
        (3.464101615, 62.32940186, -6),
        (6.92820323, 62.32940186, 0),
        (3.464101615, 62.32940186, 6),
        (-3.464101615, 62.32940186, 6),
        (-6.92820323, 62.32940186, 0),
        (-3.464101615, 62.32940186, -6),
    ]]
    fillet(cong_4_edges, radius=CONG_4_R)


solid = part.part
